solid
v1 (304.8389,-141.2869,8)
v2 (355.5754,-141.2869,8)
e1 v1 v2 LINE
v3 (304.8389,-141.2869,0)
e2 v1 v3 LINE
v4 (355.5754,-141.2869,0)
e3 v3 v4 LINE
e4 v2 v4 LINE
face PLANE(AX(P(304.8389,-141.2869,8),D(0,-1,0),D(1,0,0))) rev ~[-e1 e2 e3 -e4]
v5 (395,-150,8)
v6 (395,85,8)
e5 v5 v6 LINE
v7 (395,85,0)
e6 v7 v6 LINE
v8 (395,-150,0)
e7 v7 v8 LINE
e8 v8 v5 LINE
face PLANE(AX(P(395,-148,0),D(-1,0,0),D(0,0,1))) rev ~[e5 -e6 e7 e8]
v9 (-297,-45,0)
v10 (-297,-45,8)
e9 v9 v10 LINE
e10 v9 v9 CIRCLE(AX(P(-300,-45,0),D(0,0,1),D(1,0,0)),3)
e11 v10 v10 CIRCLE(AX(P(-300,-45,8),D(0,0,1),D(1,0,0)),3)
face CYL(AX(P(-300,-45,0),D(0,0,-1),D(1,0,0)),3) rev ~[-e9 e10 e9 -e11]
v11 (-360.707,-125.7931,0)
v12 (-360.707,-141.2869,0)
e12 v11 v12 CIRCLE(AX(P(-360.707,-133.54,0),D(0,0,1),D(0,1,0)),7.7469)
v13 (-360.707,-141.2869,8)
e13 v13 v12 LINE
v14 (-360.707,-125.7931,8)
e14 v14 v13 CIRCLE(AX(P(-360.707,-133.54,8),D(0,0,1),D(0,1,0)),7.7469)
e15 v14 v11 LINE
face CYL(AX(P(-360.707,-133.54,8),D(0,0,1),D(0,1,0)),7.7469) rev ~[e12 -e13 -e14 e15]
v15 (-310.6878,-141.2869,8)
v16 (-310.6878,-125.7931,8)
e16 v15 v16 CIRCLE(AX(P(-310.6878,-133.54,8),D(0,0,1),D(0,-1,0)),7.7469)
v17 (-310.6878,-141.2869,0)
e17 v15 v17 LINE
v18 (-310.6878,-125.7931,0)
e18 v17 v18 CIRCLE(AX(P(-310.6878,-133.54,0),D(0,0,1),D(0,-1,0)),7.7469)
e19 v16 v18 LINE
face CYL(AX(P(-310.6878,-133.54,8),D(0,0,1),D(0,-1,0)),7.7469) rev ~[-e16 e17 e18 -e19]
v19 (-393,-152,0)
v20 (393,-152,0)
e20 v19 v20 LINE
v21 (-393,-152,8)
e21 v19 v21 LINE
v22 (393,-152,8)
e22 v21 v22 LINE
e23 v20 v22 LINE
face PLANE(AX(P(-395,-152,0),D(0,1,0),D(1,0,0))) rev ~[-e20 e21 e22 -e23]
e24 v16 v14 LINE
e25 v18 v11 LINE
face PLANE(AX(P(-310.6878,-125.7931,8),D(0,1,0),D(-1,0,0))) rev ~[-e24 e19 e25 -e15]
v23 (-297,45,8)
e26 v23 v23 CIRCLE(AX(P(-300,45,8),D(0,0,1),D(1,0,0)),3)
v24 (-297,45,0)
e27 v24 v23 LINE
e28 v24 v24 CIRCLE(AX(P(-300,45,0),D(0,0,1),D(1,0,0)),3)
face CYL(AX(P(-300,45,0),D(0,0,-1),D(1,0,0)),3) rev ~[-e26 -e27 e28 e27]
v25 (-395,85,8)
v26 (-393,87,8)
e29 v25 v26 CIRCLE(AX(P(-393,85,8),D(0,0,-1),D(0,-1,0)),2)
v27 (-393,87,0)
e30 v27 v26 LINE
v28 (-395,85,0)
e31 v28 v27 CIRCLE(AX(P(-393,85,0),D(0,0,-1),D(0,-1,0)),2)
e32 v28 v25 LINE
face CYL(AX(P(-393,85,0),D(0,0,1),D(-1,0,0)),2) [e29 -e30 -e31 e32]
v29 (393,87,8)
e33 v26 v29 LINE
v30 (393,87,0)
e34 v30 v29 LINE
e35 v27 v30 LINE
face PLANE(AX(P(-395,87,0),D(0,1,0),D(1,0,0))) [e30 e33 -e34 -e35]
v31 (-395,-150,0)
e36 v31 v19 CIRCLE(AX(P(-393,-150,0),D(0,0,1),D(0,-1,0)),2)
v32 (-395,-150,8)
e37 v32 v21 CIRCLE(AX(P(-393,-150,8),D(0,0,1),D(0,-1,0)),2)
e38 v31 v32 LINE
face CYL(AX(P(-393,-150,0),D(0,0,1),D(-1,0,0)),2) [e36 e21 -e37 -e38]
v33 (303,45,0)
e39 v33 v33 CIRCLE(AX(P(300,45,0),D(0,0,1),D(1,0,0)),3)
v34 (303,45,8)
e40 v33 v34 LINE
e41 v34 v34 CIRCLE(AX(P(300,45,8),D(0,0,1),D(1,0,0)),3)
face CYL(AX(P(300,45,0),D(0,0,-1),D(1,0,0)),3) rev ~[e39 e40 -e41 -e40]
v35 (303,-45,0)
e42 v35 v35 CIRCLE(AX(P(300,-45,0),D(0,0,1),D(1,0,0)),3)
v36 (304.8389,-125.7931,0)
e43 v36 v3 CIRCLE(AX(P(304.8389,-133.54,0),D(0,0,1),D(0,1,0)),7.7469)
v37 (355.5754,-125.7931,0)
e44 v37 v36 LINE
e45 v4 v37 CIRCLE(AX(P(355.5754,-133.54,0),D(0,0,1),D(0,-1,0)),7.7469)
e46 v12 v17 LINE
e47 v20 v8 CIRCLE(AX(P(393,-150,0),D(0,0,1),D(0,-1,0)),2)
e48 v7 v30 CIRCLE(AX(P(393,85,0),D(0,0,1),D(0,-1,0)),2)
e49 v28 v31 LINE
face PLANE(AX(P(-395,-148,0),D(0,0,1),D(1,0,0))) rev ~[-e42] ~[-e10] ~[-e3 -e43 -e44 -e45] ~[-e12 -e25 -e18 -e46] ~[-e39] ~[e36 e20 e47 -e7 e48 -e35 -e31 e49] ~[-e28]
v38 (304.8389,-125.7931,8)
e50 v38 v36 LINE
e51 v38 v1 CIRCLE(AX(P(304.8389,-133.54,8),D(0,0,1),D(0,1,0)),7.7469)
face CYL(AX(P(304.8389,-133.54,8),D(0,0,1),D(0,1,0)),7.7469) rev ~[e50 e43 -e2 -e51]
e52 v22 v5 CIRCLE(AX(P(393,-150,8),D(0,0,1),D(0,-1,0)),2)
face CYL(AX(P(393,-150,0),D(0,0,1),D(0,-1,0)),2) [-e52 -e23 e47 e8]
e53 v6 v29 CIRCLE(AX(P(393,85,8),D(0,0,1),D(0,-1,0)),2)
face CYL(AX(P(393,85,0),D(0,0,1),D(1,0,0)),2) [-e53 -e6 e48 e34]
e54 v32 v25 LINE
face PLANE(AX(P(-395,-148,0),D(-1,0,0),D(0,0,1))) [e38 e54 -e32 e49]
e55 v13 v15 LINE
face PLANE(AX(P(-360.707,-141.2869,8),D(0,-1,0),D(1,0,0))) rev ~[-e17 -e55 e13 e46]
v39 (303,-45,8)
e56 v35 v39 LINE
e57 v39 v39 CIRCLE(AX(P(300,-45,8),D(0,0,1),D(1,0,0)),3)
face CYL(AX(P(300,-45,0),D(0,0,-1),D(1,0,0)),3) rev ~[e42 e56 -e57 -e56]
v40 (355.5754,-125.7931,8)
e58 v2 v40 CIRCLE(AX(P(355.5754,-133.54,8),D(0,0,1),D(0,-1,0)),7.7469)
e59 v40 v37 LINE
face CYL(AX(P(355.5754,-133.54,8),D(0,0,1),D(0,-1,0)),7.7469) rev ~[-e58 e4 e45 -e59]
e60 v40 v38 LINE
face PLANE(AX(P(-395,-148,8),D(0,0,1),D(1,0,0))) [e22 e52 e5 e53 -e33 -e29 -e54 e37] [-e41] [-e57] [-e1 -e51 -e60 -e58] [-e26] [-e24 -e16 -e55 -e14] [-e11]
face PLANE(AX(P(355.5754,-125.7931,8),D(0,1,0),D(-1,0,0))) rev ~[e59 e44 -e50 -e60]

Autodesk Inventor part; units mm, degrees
ref_plane "YZ Plane" through (0, 0, 0) normal (1, 0, 0) x (0, 1, 0)
ref_plane "XZ Plane" through (0, 0, 0) normal (0, 1, 0) x (-1, 0, 0)
ref_plane "XY Plane" through (0, 0, 0) normal (0, 0, 1) x (1, 0, 0)
sketch "Sketch1" plane through (0, 0, 0) normal (0, 0, 1) x (1, 0, 0)
  circle A0 centre (300, 45) radius 3 projected
  circle A1 centre (-300, -45) radius 3 projected
  circle A2 centre (300, -45) radius 3 projected
  circle A3 centre (-300, 45) radius 3 projected
  line L0 (395, -87) -> (-395, -87) projected
  line L1 (395, -87) -> (395, 87) projected
  line L2 (-395, 87) -> (395, 87) projected
  line L3 (-395, 87) -> (-395, -87) projected
  line L4 (395, 87) -> (-395, 87)
  line L5 (-395, 87) -> (-395, -148)
  line L6 (-395, -148) -> (395, -148)
  line L7 (395, -148) -> (395, 87)
  point P0 (0, 0)
  dimension "d0" = 235
extrude "Extrusion1" add sketch "Sketch1" along normal blind 8
sketch "Sketch2" plane through (0, 0, 8) normal (0, 0, 1) x (1, 0, 0)
  line L0 (387.8577, -133.54) -> (-386.877, -133.54) construction
  line L1 (390.6938, 247.5) -> (-382.1387, 247.5) construction
  arc A0 (355.5754, 239.7531) -> (355.5754, 255.2469) centre (355.5754, 247.5) ccw projected
  arc A1 (304.8389, 255.2469) -> (304.8389, 239.7531) centre (304.8389, 247.5) ccw projected
  line L2 (355.5754, 239.7531) -> (304.8389, 239.7531) projected
  line L3 (304.8389, 255.2469) -> (355.5754, 255.2469) projected
  line L4 (-310.6878, 239.7531) -> (-360.707, 239.7531) projected
  line L5 (-360.707, 255.2469) -> (-310.6878, 255.2469) projected
  arc A2 (-310.6878, 239.7531) -> (-310.6878, 255.2469) centre (-310.6878, 247.5) ccw projected
  arc A3 (-360.707, 255.2469) -> (-360.707, 239.7531) centre (-360.707, 247.5) ccw projected
  line L6 (304.8389, -133.54) -> (355.5754, -133.54) construction
  line L7 (304.8389, -141.2869) -> (355.5754, -141.2869)
  line L8 (355.5754, -125.7931) -> (304.8389, -125.7931)
  arc A4 (304.8389, -125.7931) -> (304.8389, -141.2869) centre (304.8389, -133.54) ccw
  arc A5 (355.5754, -141.2869) -> (355.5754, -125.7931) centre (355.5754, -133.54) ccw
  line L9 (-360.707, -133.54) -> (-310.6878, -133.54) construction
  line L10 (-360.707, -141.2869) -> (-310.6878, -141.2869)
  line L11 (-310.6878, -125.7931) -> (-360.707, -125.7931)
  arc A6 (-360.707, -125.7931) -> (-360.707, -141.2869) centre (-360.707, -133.54) ccw
  arc A7 (-310.6878, -141.2869) -> (-310.6878, -125.7931) centre (-310.6878, -133.54) ccw
  point P0 (0, 0)
  point P1 (330.2072, -133.54)
  point P2 (-335.6974, -133.54)
  dimension "d3" = 381.04
extrude "Extrusion2" cut sketch "Sketch2" against normal through all contours A4 L8 A5 L7 | A6 L11 A7 L10
thicken "Thicken1" operation add thickness 4 both sides no extend neighbours no toward (0, -1, 0) faces at (-131.6667, -148, 2.6667)
fillet "Fillet1" radius 2 4 edges at (395, -152, 4) (395, 87, 4) (-395, -152, 4) (-395, 87, 4)
properties part number "Plexi_Bildverarbeitungsband"
